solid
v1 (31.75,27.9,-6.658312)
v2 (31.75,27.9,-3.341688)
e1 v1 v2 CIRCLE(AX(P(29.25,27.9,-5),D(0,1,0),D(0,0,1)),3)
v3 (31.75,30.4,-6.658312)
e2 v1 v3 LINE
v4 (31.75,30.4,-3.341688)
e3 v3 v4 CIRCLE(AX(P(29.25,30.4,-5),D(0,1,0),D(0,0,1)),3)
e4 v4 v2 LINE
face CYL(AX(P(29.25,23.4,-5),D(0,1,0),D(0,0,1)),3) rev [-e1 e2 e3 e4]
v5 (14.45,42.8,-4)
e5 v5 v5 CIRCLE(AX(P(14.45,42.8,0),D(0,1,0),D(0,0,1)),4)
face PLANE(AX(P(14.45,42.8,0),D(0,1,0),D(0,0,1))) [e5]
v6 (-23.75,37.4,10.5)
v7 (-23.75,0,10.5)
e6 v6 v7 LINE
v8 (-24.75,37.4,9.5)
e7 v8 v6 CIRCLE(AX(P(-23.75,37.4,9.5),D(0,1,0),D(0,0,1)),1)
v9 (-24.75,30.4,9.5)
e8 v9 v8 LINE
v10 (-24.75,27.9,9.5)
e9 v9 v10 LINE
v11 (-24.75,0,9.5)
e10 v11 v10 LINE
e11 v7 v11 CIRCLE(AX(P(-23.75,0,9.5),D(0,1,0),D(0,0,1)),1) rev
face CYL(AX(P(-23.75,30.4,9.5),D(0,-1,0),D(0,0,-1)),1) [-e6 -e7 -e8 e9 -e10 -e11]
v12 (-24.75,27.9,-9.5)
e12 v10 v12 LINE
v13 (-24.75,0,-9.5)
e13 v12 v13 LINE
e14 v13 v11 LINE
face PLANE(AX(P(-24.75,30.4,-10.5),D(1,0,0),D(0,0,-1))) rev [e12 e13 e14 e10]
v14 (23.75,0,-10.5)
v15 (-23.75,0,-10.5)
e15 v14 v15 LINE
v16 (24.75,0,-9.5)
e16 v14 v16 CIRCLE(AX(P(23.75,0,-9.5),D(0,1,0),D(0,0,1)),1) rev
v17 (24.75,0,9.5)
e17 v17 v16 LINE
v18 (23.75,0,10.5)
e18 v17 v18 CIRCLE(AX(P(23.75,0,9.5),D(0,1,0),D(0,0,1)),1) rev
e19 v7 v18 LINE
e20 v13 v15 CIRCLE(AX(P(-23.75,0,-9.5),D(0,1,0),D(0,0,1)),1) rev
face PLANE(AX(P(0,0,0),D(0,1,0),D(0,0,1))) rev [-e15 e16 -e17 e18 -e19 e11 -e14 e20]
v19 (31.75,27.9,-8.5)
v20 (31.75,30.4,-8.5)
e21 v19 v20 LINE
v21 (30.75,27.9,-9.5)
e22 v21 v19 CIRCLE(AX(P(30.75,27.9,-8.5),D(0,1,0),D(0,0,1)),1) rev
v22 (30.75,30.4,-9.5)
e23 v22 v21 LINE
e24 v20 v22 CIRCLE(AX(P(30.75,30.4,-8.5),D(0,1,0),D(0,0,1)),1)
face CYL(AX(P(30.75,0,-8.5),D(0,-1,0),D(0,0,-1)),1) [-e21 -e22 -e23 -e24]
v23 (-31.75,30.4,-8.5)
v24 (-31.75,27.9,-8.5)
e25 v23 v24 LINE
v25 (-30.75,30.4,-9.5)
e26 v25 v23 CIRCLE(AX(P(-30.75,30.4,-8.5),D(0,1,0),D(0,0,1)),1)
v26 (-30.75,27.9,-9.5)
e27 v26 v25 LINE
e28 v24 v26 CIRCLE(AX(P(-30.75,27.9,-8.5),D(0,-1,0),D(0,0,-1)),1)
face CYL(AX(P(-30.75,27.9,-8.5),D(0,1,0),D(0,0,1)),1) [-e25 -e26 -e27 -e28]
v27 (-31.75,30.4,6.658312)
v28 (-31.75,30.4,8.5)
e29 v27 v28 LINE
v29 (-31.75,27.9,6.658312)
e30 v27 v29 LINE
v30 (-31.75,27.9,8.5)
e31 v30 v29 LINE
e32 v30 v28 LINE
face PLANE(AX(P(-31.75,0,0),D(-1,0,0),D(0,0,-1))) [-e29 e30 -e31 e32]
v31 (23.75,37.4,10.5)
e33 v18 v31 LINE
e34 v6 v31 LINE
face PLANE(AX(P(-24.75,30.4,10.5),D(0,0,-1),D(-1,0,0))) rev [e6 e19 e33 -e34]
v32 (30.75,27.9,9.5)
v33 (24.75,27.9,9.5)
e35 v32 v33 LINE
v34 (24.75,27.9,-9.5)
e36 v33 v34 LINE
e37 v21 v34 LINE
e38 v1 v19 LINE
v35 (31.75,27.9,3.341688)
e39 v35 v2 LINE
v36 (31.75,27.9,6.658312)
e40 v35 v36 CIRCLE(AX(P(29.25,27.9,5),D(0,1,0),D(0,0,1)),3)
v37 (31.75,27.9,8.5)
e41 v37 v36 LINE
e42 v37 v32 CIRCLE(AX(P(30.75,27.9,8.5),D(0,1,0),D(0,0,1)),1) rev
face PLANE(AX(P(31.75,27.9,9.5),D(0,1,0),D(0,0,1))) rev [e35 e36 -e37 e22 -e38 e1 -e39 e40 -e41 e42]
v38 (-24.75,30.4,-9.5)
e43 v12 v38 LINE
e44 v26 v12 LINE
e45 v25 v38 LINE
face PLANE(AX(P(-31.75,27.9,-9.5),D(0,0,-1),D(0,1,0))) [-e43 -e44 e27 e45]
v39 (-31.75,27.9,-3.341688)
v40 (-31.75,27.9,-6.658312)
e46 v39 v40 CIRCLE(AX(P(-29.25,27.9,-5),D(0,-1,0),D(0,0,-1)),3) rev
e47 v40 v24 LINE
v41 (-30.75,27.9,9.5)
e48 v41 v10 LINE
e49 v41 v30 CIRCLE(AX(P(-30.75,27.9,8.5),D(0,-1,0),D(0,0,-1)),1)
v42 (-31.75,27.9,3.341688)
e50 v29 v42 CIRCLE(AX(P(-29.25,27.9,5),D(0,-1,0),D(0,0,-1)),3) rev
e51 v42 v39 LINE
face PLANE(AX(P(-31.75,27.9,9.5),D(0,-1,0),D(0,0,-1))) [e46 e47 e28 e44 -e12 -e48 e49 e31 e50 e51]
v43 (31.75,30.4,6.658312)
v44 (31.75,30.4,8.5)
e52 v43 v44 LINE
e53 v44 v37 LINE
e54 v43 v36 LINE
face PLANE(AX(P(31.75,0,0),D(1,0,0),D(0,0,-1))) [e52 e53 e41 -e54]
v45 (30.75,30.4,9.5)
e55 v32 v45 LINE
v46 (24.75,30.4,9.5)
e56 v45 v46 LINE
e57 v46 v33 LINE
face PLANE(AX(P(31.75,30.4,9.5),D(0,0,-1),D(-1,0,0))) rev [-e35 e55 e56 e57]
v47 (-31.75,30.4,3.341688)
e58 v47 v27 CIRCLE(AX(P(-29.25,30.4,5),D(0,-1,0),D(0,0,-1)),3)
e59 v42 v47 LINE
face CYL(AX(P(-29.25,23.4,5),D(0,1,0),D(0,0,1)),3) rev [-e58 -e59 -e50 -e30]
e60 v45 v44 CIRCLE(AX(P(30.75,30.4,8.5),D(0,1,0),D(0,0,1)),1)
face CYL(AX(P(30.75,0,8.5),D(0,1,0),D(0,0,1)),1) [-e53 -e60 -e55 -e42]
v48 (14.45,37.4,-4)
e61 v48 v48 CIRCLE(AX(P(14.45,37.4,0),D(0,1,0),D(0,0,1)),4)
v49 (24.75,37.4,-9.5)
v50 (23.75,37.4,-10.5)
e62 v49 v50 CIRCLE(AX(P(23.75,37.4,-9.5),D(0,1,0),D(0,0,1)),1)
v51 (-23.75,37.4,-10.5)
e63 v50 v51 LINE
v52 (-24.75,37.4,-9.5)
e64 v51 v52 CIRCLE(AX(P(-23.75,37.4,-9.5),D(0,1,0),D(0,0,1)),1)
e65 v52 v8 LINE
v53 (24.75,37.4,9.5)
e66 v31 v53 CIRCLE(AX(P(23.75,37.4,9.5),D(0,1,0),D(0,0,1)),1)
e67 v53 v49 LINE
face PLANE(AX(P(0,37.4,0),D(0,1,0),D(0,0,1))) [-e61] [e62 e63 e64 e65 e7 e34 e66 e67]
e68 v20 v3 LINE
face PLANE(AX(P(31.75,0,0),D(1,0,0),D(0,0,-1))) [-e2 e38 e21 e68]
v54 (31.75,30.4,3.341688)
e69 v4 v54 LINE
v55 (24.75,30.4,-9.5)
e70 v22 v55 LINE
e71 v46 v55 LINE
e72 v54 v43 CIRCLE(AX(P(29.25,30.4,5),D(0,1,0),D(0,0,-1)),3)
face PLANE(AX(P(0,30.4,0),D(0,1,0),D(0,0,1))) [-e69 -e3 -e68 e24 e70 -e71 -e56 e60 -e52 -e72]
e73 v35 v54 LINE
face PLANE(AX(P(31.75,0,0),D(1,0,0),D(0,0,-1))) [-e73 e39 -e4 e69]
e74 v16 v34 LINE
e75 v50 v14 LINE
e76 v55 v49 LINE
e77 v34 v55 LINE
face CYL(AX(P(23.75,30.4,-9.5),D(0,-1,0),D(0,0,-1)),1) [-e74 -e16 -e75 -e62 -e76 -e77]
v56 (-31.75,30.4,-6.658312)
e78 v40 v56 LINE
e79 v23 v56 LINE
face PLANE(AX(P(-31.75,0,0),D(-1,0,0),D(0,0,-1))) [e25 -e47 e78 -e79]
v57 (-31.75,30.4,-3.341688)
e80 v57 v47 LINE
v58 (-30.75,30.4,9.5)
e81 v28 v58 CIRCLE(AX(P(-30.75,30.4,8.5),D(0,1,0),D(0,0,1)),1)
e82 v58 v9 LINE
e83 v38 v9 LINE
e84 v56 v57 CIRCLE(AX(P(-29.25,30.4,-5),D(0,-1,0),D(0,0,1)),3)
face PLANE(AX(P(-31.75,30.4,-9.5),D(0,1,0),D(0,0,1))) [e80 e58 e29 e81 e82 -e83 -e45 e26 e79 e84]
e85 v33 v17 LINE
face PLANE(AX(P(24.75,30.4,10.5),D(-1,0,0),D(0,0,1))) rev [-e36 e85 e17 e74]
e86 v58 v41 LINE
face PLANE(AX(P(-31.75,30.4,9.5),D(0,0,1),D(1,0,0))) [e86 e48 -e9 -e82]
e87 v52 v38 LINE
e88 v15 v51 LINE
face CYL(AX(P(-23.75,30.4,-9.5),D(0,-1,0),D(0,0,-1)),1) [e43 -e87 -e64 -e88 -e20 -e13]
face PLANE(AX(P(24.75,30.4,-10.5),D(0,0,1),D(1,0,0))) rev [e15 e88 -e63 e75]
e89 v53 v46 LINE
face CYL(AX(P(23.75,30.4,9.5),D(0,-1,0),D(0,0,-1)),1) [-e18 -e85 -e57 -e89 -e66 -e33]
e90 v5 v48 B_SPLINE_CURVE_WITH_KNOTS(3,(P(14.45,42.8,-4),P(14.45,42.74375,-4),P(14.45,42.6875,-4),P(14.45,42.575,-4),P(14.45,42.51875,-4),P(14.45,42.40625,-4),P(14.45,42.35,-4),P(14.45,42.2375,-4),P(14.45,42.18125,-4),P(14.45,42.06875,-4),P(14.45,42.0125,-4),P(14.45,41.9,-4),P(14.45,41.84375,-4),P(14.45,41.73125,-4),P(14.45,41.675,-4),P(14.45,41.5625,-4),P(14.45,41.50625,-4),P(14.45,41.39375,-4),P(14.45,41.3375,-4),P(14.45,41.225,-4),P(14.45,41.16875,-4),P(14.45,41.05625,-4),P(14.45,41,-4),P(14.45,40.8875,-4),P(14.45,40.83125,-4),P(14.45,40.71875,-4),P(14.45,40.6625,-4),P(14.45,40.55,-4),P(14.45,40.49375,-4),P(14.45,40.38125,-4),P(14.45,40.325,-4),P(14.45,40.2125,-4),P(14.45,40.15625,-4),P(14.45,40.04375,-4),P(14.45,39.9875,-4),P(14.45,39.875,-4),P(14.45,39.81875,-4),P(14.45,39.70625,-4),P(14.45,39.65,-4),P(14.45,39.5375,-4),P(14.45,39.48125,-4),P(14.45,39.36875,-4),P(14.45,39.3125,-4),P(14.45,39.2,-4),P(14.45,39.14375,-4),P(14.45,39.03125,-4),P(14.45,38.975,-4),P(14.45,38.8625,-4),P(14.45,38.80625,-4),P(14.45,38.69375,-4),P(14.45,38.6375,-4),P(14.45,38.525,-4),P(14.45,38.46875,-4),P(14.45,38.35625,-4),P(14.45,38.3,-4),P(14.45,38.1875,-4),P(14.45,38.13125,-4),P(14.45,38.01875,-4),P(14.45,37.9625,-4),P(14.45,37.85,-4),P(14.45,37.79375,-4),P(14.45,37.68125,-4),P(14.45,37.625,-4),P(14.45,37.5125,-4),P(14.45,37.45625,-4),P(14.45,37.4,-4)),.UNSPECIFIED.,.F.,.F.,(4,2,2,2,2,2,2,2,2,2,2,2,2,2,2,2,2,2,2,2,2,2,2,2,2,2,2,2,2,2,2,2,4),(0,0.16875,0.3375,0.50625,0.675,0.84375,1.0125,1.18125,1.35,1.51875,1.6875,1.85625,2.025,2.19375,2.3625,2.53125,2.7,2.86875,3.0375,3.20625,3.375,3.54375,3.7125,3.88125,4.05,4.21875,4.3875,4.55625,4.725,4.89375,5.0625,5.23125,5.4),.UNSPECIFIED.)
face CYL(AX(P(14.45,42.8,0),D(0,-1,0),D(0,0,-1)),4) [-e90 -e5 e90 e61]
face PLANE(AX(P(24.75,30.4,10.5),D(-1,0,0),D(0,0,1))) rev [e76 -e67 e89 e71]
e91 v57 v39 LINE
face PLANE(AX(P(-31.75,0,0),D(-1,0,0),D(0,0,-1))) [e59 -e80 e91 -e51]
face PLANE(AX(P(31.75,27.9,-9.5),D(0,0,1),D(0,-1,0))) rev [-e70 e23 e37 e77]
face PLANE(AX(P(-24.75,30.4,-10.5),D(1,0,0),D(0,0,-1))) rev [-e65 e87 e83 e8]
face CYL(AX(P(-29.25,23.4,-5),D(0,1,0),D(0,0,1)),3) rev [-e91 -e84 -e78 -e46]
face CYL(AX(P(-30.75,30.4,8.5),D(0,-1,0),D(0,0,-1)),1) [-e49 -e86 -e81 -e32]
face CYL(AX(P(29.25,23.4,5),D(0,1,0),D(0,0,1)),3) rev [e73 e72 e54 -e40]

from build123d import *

# Parameters (mm, degrees)
SKETCH_1_W          = 49.5
SKETCH_1_H          = 21
EXTRUDE_1_DEPTH     = 30.4
SKETCH_2_W          = 19
SKETCH_2_H          = 2.5
EXTRUDE_2_DEPTH     = 7
SKETCH_3_W          = 49.5
SKETCH_3_H          = 21
EXTRUDE_3_DEPTH     = 7
SKETCH_4_R          = 3
CUT_EXTRUDE_1_DEPTH = 7
SKETCH_5_R          = 4
EXTRUDE_4_DEPTH     = 5.4
FILLET_1_R          = 1
FILLET_2_R          = 1
FILLET_3_R          = 1
FILLET_4_R          = 1
FILLET_5_R          = 1
FILLET_6_R          = 1
FILLET_7_R          = 1
FILLET_8_R          = 1


with BuildPart() as part:
    # 草图1 → 凸台-拉伸1 (new body)
    with BuildSketch(Plane(origin=(0, 0, 0), x_dir=(1, 0, 0), z_dir=(0, 1, 0))):
        Rectangle(SKETCH_1_W, SKETCH_1_H)
    extrude(amount=EXTRUDE_1_DEPTH)

    # 草图2 → 凸台-拉伸2 (add)
    with BuildSketch(Plane(origin=(24.75, 0, 0), x_dir=(0, 0, -1), z_dir=(1, 0, 0))):
        with Locations((0, 29.15)):
            Rectangle(SKETCH_2_W, SKETCH_2_H)
    extrude_2 = extrude(amount=EXTRUDE_2_DEPTH)

    # 草图3 → 凸台-拉伸3 (add)
    with BuildSketch(Plane(origin=(0, 30.4, 0), x_dir=(1, 0, 0), z_dir=(0, 1, 0))):
        Rectangle(SKETCH_3_W, SKETCH_3_H)
    extrude(amount=EXTRUDE_3_DEPTH)

    # 草图4 → 切除-拉伸1 (cut)
    with BuildSketch(Plane(origin=(0, 30.4, 0), x_dir=(1, 0, 0), z_dir=(0, 1, 0))):
        with Locations((29.25, 5)):
            Circle(SKETCH_4_R)
        with Locations((29.25, -5)):
            Circle(SKETCH_4_R)
    cut_extrude_1 = extrude(amount=-CUT_EXTRUDE_1_DEPTH, mode=Mode.SUBTRACT)

    # 草图5 → 凸台-拉伸4 (add)
    with BuildSketch(Plane(origin=(0, 37.4, 0), x_dir=(1, 0, 0), z_dir=(0, 1, 0))):
        with Locations(Location((14.45, 0, 0), (0, 0, 90))):
            Circle(SKETCH_5_R)
    extrude(amount=EXTRUDE_4_DEPTH)

    # 镜向2: 凸台-拉伸2, 切除-拉伸1 across plane
    add(extrude_2.mirror(Plane(origin=(0, 0, 0), x_dir=(0, 0, 1), z_dir=(1, 0, 0))))
    add(cut_extrude_1.mirror(Plane(origin=(0, 0, 0), x_dir=(0, 0, 1), z_dir=(1, 0, 0))), mode=Mode.SUBTRACT)

    # 圆角1
    fillet_1_edges = [part.edges().sort_by_distance(p)[0] for p in [
        (24.75, 18.7, -10.5),
    ]]
    fillet(fillet_1_edges, radius=FILLET_1_R - 0.0001)  # a hair under: the kernel refuses the full size

    # 圆角2
    fillet_2_edges = [part.edges().sort_by_distance(p)[0] for p in [
        (24.75, 18.7, 10.5),
    ]]
    fillet(fillet_2_edges, radius=FILLET_2_R - 0.0001)  # a hair under: the kernel refuses the full size

    # 圆角3
    fillet_3_edges = [part.edges().sort_by_distance(p)[0] for p in [
        (-24.75, 18.7, 10.5),
    ]]
    fillet(fillet_3_edges, radius=FILLET_3_R - 0.0001)  # a hair under: the kernel refuses the full size

    # 圆角4
    fillet_4_edges = [part.edges().sort_by_distance(p)[0] for p in [
        (-24.75, 18.7, -10.5),
    ]]
    fillet(fillet_4_edges, radius=FILLET_4_R - 0.0001)  # a hair under: the kernel refuses the full size

    # 圆角5
    fillet_5_edges = [part.edges().sort_by_distance(p)[0] for p in [
        (-31.75, 29.15, -9.5),
    ]]
    fillet(fillet_5_edges, radius=FILLET_5_R)

    # 圆角6
    fillet_6_edges = [part.edges().sort_by_distance(p)[0] for p in [
        (-31.75, 29.15, 9.5),
    ]]
    fillet(fillet_6_edges, radius=FILLET_6_R)

    # 圆角7
    fillet_7_edges = [part.edges().sort_by_distance(p)[0] for p in [
        (31.75, 29.15, 9.5),
    ]]
    fillet(fillet_7_edges, radius=FILLET_7_R)

    # 圆角8
    fillet_8_edges = [part.edges().sort_by_distance(p)[0] for p in [
        (31.75, 29.15, -9.5),
    ]]
    fillet(fillet_8_edges, radius=FILLET_8_R)


solid = part.part
